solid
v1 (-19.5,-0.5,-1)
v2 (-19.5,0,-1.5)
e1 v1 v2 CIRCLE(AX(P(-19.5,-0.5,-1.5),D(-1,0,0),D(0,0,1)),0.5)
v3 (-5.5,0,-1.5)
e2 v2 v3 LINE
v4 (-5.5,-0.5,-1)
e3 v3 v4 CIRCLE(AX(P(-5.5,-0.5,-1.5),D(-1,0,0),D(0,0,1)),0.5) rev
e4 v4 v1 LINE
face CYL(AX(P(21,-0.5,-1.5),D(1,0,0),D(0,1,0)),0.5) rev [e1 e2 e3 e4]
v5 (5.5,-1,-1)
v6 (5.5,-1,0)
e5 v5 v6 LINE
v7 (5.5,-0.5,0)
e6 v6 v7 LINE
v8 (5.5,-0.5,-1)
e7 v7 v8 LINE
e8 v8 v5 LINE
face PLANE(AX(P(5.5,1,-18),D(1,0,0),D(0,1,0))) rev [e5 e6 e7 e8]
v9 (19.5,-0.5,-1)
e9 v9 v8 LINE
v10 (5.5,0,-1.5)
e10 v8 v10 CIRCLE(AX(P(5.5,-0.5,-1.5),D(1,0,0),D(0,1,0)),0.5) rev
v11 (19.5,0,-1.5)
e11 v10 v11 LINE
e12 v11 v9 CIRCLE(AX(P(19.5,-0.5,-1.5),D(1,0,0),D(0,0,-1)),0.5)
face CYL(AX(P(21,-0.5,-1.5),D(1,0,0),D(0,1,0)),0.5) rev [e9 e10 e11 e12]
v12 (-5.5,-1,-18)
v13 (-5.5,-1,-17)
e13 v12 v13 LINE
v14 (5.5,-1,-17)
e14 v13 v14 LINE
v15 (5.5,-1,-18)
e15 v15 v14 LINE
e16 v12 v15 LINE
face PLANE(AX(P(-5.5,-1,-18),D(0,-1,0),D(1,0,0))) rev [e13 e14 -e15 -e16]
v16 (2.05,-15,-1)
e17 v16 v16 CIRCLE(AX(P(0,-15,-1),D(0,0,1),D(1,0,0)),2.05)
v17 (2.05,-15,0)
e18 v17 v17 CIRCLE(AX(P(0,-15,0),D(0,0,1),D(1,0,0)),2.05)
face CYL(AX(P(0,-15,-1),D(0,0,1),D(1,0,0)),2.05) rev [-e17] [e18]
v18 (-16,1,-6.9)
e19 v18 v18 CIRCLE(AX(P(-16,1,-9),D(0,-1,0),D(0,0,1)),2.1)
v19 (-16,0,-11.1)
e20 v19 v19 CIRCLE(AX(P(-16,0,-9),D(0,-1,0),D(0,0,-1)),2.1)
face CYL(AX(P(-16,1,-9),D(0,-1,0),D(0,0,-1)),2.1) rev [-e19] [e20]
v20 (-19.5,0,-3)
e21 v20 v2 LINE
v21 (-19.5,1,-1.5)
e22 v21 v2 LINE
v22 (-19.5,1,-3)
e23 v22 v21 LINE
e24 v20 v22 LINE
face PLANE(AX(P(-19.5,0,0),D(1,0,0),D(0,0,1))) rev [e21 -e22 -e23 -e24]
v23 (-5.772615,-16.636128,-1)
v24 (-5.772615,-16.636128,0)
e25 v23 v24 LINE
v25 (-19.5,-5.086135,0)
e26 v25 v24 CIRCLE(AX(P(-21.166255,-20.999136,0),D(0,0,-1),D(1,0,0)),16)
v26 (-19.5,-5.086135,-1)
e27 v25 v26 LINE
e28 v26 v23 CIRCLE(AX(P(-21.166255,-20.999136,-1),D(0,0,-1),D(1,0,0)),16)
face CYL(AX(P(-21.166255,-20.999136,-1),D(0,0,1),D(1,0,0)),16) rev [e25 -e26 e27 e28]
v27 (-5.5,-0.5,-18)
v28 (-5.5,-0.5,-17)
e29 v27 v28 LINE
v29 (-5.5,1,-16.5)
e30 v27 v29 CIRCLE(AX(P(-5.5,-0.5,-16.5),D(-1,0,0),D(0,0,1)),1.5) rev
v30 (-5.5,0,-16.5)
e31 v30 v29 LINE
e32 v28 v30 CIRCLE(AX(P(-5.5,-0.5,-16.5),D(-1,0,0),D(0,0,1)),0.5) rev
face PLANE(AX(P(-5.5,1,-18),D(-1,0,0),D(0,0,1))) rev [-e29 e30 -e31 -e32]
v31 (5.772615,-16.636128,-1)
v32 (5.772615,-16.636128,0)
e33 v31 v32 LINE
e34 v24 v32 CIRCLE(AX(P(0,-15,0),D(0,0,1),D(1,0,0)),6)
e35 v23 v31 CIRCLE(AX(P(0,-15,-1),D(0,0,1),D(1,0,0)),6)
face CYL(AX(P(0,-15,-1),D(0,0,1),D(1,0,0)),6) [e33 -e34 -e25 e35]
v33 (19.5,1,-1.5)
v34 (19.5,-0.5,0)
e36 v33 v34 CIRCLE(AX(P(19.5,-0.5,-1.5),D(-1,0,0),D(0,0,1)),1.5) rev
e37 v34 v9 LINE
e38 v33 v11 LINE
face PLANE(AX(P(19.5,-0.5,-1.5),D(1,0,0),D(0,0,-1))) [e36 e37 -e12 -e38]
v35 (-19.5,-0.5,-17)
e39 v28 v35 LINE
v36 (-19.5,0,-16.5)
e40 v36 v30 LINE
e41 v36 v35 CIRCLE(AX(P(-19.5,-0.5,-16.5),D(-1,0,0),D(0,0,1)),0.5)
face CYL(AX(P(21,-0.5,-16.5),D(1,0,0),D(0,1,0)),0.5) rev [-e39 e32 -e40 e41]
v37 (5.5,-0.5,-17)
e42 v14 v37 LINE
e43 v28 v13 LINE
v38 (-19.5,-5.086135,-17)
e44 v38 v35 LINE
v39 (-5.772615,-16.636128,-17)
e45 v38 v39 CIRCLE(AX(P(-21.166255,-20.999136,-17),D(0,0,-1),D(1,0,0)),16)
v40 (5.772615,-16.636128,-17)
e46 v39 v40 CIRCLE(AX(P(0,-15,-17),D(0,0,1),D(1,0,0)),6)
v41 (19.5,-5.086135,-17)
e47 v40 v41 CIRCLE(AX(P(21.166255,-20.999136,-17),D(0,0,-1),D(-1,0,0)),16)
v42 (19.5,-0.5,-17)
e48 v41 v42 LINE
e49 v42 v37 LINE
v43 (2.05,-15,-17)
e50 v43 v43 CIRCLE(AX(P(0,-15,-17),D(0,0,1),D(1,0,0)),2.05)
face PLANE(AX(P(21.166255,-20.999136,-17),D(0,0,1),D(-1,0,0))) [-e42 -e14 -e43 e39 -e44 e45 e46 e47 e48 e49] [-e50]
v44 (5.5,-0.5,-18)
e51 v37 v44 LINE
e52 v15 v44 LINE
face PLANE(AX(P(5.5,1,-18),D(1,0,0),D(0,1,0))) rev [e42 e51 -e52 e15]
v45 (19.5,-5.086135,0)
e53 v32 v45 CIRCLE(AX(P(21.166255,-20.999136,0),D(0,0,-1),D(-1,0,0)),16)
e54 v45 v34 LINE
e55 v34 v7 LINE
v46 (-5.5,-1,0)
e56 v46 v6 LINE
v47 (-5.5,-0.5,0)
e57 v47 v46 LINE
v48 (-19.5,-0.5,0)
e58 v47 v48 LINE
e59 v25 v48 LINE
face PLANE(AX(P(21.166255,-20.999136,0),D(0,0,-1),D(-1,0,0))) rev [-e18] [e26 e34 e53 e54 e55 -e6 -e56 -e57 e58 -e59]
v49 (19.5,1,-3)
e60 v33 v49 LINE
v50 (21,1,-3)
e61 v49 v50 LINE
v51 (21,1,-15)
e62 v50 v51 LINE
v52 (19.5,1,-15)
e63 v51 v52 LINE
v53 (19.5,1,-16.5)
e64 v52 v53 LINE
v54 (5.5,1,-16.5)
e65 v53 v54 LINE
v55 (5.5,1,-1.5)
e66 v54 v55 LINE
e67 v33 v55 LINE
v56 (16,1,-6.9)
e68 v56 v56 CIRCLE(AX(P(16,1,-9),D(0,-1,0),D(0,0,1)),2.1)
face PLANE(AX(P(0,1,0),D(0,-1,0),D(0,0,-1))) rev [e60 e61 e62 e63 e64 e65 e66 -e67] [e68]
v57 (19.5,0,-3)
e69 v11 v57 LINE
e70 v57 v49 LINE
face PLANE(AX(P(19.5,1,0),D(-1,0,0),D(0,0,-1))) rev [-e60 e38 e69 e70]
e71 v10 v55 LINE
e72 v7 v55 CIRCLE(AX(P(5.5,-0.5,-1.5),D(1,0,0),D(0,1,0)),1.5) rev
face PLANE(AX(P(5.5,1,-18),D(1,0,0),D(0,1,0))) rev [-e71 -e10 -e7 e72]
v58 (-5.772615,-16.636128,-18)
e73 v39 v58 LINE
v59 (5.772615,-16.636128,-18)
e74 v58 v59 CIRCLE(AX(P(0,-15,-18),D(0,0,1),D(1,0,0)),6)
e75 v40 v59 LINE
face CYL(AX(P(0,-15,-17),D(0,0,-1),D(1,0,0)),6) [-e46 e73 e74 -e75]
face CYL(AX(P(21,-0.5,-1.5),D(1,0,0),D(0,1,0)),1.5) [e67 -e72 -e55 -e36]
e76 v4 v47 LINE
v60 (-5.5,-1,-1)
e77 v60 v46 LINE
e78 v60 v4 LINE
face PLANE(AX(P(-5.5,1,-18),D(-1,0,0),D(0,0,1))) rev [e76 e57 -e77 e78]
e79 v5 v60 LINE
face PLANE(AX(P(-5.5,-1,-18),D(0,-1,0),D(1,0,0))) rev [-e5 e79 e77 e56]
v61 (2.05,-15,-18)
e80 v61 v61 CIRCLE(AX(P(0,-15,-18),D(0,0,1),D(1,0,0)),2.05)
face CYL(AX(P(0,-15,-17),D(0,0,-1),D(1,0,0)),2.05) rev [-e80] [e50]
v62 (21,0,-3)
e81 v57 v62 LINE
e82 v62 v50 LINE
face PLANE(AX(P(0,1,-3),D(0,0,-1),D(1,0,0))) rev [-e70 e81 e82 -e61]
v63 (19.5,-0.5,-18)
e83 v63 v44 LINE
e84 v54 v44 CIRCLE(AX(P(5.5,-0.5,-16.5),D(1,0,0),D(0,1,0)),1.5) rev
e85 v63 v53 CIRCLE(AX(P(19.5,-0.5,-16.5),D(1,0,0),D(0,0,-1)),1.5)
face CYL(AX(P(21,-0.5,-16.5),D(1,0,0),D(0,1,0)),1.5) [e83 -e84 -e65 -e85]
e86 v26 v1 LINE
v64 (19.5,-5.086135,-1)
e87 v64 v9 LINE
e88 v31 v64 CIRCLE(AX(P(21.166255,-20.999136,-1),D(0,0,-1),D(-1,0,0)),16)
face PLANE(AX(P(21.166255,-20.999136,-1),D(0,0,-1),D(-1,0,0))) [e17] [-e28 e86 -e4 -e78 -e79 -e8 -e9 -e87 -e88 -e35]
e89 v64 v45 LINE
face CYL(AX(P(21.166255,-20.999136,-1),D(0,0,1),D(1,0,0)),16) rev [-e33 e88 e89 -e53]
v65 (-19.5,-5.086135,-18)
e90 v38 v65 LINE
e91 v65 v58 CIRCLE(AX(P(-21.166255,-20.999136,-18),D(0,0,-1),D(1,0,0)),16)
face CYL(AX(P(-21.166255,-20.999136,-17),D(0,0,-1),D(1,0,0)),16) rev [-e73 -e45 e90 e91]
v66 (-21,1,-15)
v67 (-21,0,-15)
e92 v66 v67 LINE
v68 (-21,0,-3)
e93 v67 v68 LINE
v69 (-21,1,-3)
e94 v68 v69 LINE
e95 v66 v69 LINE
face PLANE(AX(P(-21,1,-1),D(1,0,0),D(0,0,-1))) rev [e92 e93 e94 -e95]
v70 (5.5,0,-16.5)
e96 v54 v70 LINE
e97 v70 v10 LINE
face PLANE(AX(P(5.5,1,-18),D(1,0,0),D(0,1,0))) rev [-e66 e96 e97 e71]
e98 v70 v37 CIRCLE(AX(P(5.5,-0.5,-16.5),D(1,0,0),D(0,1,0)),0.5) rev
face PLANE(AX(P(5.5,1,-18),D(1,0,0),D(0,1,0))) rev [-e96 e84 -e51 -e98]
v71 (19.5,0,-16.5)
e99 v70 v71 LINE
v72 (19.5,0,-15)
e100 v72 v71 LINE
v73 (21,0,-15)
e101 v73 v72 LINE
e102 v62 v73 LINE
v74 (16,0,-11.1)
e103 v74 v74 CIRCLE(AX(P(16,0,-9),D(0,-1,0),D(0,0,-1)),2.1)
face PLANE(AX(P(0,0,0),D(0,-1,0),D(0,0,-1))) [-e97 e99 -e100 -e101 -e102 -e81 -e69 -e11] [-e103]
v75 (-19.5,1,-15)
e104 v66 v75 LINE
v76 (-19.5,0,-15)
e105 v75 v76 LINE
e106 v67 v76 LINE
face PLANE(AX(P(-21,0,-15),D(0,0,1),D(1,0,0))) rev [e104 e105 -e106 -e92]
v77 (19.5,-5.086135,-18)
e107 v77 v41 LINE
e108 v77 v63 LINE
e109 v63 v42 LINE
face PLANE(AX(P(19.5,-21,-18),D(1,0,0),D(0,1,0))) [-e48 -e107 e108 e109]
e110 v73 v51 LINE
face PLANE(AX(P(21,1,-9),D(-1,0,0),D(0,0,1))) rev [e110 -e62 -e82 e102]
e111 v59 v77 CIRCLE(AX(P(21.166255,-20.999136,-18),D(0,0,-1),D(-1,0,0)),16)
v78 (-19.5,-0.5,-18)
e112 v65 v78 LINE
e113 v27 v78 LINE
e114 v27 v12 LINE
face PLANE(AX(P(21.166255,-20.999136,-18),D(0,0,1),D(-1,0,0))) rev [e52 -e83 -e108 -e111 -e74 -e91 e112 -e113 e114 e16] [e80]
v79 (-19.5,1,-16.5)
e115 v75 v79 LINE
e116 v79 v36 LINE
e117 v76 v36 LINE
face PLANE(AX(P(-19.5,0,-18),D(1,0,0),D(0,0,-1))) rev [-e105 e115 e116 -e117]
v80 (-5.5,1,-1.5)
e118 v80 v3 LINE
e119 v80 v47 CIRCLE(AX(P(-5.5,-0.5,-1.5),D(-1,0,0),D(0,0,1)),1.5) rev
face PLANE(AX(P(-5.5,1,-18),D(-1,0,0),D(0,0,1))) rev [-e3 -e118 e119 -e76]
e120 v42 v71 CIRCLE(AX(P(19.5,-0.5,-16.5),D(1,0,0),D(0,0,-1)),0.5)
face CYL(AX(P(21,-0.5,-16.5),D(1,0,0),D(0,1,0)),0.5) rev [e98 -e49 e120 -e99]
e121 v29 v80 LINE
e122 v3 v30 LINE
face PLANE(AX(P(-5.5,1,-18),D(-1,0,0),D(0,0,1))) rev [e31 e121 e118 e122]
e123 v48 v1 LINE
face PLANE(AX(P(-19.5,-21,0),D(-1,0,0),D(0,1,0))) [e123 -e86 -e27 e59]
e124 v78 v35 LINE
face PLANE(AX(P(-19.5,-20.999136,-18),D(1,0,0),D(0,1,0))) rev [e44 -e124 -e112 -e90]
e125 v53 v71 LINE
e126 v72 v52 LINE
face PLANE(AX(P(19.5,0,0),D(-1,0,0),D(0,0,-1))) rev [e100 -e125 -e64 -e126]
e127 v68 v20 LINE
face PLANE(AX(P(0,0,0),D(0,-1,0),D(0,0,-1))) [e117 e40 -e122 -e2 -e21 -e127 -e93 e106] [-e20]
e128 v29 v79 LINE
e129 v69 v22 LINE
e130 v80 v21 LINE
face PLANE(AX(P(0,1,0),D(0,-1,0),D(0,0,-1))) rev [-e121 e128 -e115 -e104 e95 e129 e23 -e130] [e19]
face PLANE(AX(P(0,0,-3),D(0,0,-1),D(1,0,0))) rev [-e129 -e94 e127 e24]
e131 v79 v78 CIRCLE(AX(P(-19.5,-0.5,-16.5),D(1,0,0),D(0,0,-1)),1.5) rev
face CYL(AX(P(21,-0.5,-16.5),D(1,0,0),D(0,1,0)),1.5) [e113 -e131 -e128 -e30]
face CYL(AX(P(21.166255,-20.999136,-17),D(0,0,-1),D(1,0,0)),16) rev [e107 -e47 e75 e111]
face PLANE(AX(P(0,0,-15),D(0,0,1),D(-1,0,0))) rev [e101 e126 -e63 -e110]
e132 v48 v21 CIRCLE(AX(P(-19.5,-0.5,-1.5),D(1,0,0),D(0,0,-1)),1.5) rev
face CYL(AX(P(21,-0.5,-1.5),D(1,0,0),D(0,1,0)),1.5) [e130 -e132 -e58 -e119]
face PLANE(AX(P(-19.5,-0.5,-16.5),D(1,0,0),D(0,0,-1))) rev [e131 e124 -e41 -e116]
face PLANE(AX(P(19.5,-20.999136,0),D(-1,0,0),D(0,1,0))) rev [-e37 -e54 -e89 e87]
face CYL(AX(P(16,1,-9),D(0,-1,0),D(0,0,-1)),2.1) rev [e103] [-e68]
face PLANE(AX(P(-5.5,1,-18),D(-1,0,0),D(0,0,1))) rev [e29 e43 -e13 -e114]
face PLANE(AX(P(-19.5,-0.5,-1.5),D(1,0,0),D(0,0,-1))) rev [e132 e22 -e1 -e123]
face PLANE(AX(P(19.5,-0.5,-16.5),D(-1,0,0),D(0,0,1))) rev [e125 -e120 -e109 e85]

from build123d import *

# Parameters (mm, degrees)
SKETCH_1_R                       = 2.05
SM_BASE_FLANGE_2_DEPTH           = 1
SM_EDGE_FLANGE_1_STRIP_W         = 5
SM_EDGE_FLANGE_1_STRIP_H         = 1
SM_EDGE_FLANGE_1_STRIP_CUT_DEPTH = 42
SM_EDGE_FLANGE_1_DEPTH           = 42
SKETCH_13_W                      = 11
SKETCH_13_H                      = 2
CUT_EXTRUDE_1_DEPTH              = 35.727510708
SKETCH_14_R                      = 2.1
SKETCH_14_W                      = 1.5
SKETCH_14_H                      = 3
CUT_EXTRUDE_2_DEPTH              = 36.341194094


# Sheet-metal steps are written as plain solids
with BuildPart() as part:
    # Sketch 1 → Базовая кромка2 (new body)
    with BuildSketch(Plane.XY):
        with BuildLine():
            Line((-21, -5), (-21, 0))
            Line((-21, 0), (21, 0))
            Line((21, 0), (21, -5))
            ThreePointArc((21, -5), (11.451449282, -8.286050683), (5.772615091, -16.636128055))
            ThreePointArc((5.772615091, -16.636128055), (0, -21), (-5.772615091, -16.636128055))
            ThreePointArc((-5.772615091, -16.636128055), (-11.451449282, -8.286050683), (-21, -5))
        make_face()
        with Locations((0, -15)):
            Circle(SKETCH_1_R, mode=Mode.SUBTRACT)
    extrude(amount=-SM_BASE_FLANGE_2_DEPTH)

    # Ребро-кромка1 strip (across the edge) → Ребро-кромка1 strip cut (cut)
    with BuildSketch(Plane(origin=(-21, 0, -1), x_dir=(0, -1, 0), z_dir=(1, 0, 0))):
        with Locations((-2, -0.5)):
            Rectangle(SM_EDGE_FLANGE_1_STRIP_W, SM_EDGE_FLANGE_1_STRIP_H)
    extrude(amount=SM_EDGE_FLANGE_1_STRIP_CUT_DEPTH, mode=Mode.SUBTRACT)

    # Ребро-кромка1 section (across the edge) → Ребро-кромка1 (add)
    with BuildSketch(Plane(origin=(-21, 0, -1), x_dir=(0, -1, 0), z_dir=(1, 0, 0))):
        with BuildLine():
            Line((-1, 0.5), (-1, 8))
            Line((-1, 8), (0, 8))
            Line((0, 8), (0, 0.5))
            ThreePointArc((0, 0.5), (0.146446609, 0.146446609), (0.5, 0))
            Line((0.5, 0), (0.5, -1))
            ThreePointArc((0.5, -1), (-0.560660172, -0.560660172), (-1, 0.5))
        make_face()
    extrude(amount=SM_EDGE_FLANGE_1_DEPTH)

    # Зеркальное отражение1: part across plane


with BuildPart() as part_1:
    add(part.part)
    add(part.part.mirror(Plane(origin=(-21, 1, -9), x_dir=(1, 0, 0), z_dir=(0, 0, 1))))

    # Эскиз13 → Вырез-Вытянуть1 (cut, through all)
    with BuildSketch(Plane.XY):
        Rectangle(SKETCH_13_W, SKETCH_13_H)
    extrude(amount=-CUT_EXTRUDE_1_DEPTH, mode=Mode.SUBTRACT)

    # Эскиз14 → Вырез-Вытянуть2 (cut, through all)
    with BuildSketch(Plane(origin=(0, 1, 0), x_dir=(1, 0, 0), z_dir=(0, 1, 0))):
        with Locations(Location((-16, 9, 0), (0, 0, 90))):
            Circle(SKETCH_14_R)
        with Locations(Location((16, 9, 0), (0, 0, 90))):
            Circle(SKETCH_14_R)
        with Locations((-20.25, 16.5)):
            Rectangle(SKETCH_14_W, SKETCH_14_H)
        with Locations((-20.25, 1.5)):
            Rectangle(SKETCH_14_W, SKETCH_14_H)
        with Locations((20.25, 1.5)):
            Rectangle(SKETCH_14_W, SKETCH_14_H)
        with Locations((20.25, 16.5)):
            Rectangle(SKETCH_14_W, SKETCH_14_H)
    extrude(amount=-CUT_EXTRUDE_2_DEPTH, mode=Mode.SUBTRACT)


solid = part_1.part
